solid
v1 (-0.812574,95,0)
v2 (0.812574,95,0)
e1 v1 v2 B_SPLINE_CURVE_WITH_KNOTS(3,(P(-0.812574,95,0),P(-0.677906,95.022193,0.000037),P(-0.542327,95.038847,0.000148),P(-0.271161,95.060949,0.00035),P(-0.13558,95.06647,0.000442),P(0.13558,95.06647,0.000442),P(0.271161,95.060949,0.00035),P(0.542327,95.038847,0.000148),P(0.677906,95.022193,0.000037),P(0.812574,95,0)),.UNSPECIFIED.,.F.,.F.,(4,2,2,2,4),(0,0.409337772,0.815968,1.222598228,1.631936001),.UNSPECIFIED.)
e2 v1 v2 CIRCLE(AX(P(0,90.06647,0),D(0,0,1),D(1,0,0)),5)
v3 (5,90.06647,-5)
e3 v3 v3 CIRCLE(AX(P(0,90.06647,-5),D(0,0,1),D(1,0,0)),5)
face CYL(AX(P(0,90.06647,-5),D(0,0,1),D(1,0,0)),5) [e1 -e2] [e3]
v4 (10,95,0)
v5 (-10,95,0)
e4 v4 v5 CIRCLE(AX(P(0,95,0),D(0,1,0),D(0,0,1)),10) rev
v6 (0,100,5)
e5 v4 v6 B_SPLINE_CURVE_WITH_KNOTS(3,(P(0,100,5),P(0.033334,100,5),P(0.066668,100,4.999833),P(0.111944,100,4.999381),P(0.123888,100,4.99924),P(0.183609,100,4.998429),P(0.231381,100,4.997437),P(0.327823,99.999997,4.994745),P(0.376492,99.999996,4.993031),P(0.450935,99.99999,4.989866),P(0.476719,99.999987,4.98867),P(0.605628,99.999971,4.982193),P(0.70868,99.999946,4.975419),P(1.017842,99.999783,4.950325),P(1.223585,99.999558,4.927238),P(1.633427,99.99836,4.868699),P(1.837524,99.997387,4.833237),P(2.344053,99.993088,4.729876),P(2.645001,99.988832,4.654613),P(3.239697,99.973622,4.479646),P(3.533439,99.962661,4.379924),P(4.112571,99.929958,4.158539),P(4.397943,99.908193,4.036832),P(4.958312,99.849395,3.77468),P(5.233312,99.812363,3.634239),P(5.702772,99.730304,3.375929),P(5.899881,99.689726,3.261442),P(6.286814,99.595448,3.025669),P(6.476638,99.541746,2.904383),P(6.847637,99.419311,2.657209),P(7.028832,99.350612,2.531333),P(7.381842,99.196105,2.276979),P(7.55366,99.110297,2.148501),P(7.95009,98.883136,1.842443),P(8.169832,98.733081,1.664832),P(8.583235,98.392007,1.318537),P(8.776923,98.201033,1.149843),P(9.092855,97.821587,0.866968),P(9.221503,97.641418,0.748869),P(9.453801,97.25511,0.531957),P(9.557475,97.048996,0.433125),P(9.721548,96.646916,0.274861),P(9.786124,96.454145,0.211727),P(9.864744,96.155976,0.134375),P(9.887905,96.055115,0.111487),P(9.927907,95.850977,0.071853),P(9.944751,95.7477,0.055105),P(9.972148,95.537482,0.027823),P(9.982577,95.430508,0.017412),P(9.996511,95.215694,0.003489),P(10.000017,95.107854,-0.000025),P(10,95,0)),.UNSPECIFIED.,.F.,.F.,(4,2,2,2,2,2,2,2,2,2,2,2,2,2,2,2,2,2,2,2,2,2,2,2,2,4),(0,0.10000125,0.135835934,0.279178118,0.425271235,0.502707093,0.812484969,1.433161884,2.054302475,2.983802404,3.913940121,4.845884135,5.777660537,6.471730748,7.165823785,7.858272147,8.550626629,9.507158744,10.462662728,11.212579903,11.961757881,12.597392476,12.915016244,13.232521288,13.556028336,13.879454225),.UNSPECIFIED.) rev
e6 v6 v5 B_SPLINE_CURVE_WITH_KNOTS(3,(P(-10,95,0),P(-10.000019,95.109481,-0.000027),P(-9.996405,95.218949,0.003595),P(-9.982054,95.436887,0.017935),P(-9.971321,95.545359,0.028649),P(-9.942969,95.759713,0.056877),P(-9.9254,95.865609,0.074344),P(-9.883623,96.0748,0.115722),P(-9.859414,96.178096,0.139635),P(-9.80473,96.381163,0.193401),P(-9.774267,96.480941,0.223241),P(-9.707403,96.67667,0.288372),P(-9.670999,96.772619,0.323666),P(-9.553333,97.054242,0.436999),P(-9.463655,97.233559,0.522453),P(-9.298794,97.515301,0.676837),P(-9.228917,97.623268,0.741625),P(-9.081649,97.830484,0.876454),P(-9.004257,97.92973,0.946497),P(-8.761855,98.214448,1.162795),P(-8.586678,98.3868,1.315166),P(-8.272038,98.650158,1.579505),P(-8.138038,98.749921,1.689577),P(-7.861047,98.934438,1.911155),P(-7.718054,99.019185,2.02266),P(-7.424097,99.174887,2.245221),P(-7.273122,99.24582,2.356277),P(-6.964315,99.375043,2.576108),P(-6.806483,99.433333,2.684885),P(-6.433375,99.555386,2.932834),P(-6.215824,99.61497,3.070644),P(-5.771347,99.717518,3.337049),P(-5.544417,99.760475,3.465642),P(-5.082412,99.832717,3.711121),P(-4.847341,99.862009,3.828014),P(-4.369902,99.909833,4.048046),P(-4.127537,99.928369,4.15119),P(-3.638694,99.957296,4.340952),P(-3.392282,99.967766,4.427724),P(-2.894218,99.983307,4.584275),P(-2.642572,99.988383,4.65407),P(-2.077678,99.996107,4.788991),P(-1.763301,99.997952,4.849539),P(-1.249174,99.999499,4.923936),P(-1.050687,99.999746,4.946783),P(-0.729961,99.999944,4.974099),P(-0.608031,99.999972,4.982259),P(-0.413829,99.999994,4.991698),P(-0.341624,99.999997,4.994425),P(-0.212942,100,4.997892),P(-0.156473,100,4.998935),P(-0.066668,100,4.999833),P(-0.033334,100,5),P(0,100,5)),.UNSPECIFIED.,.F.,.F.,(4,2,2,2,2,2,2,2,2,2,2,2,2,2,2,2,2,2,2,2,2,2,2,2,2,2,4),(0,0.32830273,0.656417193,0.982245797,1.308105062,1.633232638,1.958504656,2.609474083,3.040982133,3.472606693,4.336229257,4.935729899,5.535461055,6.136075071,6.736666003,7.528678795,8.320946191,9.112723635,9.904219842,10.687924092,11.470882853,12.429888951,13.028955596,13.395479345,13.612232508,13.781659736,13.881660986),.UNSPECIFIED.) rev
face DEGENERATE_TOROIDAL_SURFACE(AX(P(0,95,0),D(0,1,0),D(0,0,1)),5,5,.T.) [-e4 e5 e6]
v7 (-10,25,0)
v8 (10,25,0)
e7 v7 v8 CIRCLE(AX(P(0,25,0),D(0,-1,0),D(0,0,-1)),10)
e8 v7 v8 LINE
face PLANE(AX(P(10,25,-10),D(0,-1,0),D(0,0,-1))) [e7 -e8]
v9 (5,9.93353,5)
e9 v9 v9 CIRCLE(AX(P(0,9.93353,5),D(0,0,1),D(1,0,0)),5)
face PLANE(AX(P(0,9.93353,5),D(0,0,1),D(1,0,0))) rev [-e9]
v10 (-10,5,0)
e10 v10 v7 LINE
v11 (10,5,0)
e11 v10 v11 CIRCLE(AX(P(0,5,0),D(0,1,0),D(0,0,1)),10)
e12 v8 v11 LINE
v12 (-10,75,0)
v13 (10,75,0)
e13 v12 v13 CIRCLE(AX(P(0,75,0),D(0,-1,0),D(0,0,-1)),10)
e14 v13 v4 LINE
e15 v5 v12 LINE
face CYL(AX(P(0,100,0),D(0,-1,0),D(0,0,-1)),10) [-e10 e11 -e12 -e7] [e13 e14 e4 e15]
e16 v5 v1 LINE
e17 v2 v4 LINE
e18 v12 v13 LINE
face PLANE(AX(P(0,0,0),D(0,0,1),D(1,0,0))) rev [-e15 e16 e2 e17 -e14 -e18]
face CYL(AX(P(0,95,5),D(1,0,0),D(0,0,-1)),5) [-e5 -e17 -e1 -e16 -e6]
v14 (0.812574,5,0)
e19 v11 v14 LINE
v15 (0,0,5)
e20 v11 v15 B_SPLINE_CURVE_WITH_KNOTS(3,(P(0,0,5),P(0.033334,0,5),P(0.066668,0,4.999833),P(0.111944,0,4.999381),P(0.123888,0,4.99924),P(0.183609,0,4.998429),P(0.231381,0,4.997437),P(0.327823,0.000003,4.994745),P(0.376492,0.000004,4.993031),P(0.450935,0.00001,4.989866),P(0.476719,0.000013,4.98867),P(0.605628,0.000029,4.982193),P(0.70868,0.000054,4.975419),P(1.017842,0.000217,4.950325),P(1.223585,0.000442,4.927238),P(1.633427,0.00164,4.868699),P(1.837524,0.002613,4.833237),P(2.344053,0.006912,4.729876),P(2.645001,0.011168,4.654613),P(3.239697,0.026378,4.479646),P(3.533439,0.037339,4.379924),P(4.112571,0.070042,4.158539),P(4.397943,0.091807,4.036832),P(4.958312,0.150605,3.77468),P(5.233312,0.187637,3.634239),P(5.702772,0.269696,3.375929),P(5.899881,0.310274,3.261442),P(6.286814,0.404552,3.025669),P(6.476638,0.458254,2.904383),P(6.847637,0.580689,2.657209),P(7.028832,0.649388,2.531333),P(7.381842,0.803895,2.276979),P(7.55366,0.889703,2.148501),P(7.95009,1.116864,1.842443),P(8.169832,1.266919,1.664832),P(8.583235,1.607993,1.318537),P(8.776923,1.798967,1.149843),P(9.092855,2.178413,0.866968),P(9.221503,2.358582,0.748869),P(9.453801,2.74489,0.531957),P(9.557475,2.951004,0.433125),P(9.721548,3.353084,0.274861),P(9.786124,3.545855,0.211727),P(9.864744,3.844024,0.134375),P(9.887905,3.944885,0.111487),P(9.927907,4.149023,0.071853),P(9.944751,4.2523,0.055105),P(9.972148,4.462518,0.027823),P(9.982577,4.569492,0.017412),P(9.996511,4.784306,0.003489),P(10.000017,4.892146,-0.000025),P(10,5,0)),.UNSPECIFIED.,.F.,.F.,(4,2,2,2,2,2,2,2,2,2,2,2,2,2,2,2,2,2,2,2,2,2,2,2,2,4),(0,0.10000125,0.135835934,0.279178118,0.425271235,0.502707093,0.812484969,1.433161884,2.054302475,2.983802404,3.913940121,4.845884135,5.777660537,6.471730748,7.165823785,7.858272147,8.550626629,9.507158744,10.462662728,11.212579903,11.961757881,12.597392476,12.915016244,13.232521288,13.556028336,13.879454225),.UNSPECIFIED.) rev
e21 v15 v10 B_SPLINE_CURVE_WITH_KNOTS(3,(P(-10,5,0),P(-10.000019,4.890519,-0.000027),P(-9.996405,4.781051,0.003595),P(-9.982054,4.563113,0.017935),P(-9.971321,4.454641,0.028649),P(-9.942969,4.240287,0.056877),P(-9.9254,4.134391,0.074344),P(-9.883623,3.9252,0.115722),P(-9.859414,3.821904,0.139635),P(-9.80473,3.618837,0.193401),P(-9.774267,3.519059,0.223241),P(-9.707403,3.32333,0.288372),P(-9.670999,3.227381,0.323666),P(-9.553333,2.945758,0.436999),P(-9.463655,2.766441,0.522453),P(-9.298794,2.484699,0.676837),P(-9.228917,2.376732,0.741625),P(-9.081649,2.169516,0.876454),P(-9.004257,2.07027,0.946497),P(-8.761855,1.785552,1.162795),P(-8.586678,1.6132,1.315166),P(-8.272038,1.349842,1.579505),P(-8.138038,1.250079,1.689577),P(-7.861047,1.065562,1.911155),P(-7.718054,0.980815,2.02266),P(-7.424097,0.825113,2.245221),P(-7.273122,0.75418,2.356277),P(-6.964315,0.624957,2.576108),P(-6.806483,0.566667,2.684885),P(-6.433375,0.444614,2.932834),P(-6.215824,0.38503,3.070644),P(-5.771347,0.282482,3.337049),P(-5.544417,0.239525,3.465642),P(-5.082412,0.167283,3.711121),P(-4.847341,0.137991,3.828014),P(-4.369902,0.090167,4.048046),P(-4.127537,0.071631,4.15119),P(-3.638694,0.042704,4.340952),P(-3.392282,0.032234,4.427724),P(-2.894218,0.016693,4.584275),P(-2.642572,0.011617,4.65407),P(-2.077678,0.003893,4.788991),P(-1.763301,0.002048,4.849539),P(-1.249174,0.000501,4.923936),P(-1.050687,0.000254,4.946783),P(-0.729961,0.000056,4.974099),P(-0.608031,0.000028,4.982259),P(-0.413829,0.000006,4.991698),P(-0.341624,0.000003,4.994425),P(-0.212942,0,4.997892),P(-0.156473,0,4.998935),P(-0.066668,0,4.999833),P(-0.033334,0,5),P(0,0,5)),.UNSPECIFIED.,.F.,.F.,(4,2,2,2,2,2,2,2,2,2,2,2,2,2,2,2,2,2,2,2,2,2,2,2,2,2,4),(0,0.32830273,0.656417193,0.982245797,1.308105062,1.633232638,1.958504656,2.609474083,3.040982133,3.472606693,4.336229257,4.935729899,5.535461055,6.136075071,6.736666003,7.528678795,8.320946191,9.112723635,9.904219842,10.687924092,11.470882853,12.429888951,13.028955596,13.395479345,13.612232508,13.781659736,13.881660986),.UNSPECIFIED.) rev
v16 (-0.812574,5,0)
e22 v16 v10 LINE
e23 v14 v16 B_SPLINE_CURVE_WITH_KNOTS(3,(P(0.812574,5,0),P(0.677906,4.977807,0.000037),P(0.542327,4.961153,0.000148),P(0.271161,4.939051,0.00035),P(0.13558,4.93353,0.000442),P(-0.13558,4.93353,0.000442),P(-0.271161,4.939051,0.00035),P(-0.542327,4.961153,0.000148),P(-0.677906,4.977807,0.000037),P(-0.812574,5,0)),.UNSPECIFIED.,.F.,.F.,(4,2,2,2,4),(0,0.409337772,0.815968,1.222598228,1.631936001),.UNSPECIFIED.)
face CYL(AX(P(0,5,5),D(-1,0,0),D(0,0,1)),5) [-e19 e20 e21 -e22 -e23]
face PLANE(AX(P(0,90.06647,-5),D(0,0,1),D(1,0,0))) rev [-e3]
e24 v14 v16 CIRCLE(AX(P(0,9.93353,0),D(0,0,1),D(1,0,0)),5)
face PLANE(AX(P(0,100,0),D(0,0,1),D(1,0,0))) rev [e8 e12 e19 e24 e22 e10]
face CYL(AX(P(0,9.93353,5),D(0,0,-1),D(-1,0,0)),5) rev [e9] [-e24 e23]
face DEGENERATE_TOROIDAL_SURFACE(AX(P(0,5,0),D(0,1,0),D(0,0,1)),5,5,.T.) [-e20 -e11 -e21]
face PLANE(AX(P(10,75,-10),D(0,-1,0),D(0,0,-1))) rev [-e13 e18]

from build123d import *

# Parameters (mm, degrees)
SKETCH1_R           = 10
BOSS_EXTRUDE1_DEPTH = 100
SKETCH4_W           = 20
SKETCH4_H           = 25
CUT_EXTRUDE2_DEPTH  = 10
SKETCH7_R           = 5
BOSS_EXTRUDE2_DEPTH = 5
FILLET7_R           = 5
SKETCH9_R           = 5
CUT_EXTRUDE3_DEPTH  = 5
FILLET8_R           = 5


with BuildPart() as part:
    # Sketch1 → Boss-Extrude1 (new body)
    with BuildSketch(Plane(origin=(0, 0, 0), x_dir=(1, 0, 0), z_dir=(0, 1, 0))):
        with Locations(Location((0, 0, 0), (0, 0, 90))):
            Circle(SKETCH1_R)
    extrude(amount=BOSS_EXTRUDE1_DEPTH)

    # Sketch4 → Cut-Extrude2 (cut)
    with BuildSketch(Plane.XY):
        with Locations((0, 87.5)):
            Rectangle(SKETCH4_W, SKETCH4_H)
    cut_extrude2 = extrude(amount=-CUT_EXTRUDE2_DEPTH, mode=Mode.SUBTRACT)

    # Sketch7 → Boss-Extrude2 (add)
    with BuildSketch(Plane.XY):
        with Locations((0, 90.066469536)):
            Circle(SKETCH7_R)
        with Locations((0, 9.933530464)):
            Circle(SKETCH7_R)
    extrude(amount=-BOSS_EXTRUDE2_DEPTH)

    # Fillet7
    # the kernel refuses this fillet: 5 mm, written as the material it takes off along each edge
    with BuildSketch(Plane(origin=(-22.5, 100, 0), x_dir=(0, -1, 0), z_dir=(1, 0, 0))) as fillet7_piece_1_section:
        with BuildLine():
            CenterArc((FILLET7_R, -FILLET7_R), FILLET7_R, 90, 90)
            Line((0, -FILLET7_R), (0, 0))
            Line((0, 0), (FILLET7_R, 0))
        make_face()
    fillet7_piece_1 = extrude(amount=45, mode=Mode.PRIVATE)
    fillet7_piece_1 = fillet7_piece_1 - Plane(origin=(0, 90.066469536, 1.132005312), x_dir=(1, 0, 0), z_dir=(0, 0, 1)) * Cylinder(5, 110, mode=Mode.PRIVATE)
    add(fillet7_piece_1, mode=Mode.SUBTRACT)
    with BuildSketch(Plane(origin=(0, 100, 0), x_dir=(-0.3134140431814407, 0, -0.9496165739584909), z_dir=(0.9496165739584909, 0, -0.3134140431814407))) as fillet7_piece_2:
        with BuildLine():
            CenterArc((10 - FILLET7_R, -FILLET7_R), FILLET7_R, 0, 90)
            Line((10 - FILLET7_R, 0), (10, 0))
            Line((10, 0), (10, -FILLET7_R))
        make_face()
    revolve(axis=Axis((0, 100, 0), (0, 1, 0)), revolution_arc=323.469804901, mode=Mode.SUBTRACT)

    # Mirror3: Cut-Extrude2 across plane
    add(cut_extrude2.mirror(Plane.ZX.offset(50)), mode=Mode.SUBTRACT)

    # Sketch9 → Cut-Extrude3 (cut)
    with BuildSketch(Plane.XY):
        with Locations((0, 9.933530464)):
            Circle(SKETCH9_R)
    extrude(amount=CUT_EXTRUDE3_DEPTH, mode=Mode.SUBTRACT)

    # Fillet8
    # the kernel refuses this fillet: 5 mm, written as the material it takes off along each edge
    with BuildSketch(Plane(origin=(0, 0, 0), x_dir=(-0.31341404318144095, 0, -0.9496165739584909), z_dir=(0.9496165739584909, 0, -0.31341404318144095))) as fillet8_piece_1:
        with BuildLine():
            CenterArc((10 - FILLET8_R, FILLET8_R), FILLET8_R, 270, 90)
            Line((10 - FILLET8_R, 0), (10, 0))
            Line((10, 0), (10, FILLET8_R))
        make_face()
    revolve(axis=Axis((0, 0, 0), (0, 1, 0)), revolution_arc=323.469804901, mode=Mode.SUBTRACT)
    with BuildSketch(Plane(origin=(-22.5, 0, 0), x_dir=(0, 0, 1), z_dir=(1, 0, 0))) as fillet8_piece_2:
        with BuildLine():
            CenterArc((FILLET8_R, -FILLET8_R), FILLET8_R, 90, 90)
            Line((0, -FILLET8_R), (0, 0))
            Line((0, 0), (FILLET8_R, 0))
        make_face()
    extrude(amount=45, mode=Mode.SUBTRACT)


solid = part.part
